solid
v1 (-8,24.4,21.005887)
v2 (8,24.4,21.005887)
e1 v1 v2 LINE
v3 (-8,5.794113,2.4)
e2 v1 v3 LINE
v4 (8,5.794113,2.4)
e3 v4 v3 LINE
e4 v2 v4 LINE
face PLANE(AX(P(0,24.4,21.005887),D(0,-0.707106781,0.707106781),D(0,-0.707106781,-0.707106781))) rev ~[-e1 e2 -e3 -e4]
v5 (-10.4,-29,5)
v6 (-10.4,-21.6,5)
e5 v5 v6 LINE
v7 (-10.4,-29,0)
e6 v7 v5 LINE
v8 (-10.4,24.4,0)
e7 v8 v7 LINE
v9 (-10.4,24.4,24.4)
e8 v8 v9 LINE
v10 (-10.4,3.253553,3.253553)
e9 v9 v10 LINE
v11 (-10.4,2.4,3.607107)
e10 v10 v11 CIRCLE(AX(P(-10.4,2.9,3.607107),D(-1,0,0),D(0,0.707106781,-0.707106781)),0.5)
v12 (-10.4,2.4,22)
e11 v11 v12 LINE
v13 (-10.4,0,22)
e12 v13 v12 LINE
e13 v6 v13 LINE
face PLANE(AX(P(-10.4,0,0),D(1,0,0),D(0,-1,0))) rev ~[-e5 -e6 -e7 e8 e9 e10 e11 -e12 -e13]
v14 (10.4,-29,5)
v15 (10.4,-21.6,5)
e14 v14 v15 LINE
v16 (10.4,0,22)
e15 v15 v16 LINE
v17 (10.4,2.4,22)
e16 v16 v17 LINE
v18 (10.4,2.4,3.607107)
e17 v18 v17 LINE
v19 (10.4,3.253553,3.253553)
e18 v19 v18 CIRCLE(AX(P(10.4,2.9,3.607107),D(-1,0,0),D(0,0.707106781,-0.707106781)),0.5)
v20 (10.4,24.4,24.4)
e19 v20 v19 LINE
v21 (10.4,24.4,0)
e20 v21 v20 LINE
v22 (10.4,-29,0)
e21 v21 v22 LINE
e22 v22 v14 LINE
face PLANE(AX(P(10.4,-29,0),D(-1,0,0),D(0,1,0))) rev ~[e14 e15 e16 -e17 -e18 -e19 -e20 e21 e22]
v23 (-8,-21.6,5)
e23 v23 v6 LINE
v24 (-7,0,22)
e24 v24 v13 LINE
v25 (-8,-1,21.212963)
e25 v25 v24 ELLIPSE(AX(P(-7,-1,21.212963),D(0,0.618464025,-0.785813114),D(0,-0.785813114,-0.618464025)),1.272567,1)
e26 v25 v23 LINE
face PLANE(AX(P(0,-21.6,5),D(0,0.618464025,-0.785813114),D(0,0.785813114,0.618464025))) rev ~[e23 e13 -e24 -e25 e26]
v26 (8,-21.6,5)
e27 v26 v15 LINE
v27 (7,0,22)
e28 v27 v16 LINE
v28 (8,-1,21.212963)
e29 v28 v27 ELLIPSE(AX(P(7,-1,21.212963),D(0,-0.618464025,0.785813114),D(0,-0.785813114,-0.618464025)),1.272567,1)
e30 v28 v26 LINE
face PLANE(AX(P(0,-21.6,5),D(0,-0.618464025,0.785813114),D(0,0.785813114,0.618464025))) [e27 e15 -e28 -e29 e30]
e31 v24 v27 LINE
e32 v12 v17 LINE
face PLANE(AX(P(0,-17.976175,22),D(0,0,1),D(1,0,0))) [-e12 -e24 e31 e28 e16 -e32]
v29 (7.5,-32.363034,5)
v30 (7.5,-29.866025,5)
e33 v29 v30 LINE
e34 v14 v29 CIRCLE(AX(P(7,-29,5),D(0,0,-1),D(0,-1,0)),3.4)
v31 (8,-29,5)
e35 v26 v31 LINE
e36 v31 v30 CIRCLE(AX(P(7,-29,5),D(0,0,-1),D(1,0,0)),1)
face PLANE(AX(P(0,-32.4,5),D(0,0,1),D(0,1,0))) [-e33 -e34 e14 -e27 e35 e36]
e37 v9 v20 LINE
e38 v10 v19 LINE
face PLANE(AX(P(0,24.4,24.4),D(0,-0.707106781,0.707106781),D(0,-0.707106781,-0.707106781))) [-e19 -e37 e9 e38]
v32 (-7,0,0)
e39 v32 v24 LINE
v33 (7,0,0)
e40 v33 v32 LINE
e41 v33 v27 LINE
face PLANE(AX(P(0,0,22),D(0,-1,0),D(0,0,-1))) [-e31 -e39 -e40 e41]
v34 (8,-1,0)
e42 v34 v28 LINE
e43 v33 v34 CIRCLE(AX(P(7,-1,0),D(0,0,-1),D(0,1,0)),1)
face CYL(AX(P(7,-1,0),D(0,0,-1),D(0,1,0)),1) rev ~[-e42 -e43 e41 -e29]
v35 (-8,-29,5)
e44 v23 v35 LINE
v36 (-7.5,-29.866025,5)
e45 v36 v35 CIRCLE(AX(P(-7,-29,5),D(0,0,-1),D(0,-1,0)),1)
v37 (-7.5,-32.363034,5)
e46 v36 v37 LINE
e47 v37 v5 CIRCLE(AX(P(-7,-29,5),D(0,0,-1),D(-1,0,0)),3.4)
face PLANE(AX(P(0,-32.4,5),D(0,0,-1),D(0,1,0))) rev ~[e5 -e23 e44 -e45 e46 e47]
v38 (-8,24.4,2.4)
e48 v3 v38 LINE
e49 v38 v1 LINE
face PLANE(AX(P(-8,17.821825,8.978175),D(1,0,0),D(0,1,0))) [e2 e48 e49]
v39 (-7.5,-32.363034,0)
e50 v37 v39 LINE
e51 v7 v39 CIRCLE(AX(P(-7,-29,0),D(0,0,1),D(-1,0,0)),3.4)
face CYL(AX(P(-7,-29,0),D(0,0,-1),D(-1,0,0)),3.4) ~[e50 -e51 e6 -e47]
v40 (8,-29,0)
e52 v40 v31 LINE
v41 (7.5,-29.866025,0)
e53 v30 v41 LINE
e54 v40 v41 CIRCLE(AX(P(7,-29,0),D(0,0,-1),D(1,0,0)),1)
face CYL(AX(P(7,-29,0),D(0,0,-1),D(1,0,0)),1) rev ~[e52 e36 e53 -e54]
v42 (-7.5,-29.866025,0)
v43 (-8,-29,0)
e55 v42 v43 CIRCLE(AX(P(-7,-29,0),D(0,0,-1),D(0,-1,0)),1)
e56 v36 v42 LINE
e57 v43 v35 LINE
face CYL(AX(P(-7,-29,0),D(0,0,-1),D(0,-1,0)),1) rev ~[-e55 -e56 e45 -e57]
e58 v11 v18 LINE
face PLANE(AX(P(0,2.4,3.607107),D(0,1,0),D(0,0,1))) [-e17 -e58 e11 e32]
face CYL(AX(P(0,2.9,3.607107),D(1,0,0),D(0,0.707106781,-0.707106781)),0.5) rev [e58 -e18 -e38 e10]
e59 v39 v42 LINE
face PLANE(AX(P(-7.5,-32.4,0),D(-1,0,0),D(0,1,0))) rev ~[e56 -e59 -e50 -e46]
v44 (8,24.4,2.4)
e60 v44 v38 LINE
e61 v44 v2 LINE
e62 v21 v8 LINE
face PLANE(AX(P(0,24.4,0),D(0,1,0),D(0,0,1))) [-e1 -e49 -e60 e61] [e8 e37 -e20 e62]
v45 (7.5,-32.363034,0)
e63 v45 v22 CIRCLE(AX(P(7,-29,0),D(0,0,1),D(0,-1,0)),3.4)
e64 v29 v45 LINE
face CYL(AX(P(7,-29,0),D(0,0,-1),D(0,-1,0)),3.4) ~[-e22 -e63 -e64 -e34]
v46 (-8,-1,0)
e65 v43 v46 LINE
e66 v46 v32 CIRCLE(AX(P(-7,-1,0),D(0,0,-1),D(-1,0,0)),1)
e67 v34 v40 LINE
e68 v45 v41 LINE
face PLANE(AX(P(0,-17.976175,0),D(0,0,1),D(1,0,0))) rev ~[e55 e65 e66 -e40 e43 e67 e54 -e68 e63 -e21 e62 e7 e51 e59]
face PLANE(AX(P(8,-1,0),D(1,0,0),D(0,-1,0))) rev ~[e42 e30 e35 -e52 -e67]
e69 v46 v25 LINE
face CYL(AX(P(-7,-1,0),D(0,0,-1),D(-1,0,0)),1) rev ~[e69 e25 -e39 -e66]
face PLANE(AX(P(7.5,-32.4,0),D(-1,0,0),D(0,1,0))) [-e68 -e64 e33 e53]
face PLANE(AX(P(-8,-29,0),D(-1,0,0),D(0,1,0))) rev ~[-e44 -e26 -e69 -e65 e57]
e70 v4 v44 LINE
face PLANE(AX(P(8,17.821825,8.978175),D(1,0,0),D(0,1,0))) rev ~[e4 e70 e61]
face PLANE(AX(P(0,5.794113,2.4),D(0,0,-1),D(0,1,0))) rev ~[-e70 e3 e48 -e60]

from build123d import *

# Parameters (mm, degrees)
F6_DEPTH       = 10.4
F8_DEPTH       = 22
F9_W           = 15
F9_H           = 3.4
F10_DEPTH      = 24.401
F12_DEPTH      = 10.401
F12_DEPTH_BACK = 10.401
F14_DEPTH      = 8


with BuildPart() as f6:
    # F5 (on Right) → F6 (new body, symmetric)
    with BuildSketch(Plane.YZ):
        with BuildLine():
            Line((24.4, 0), (24.4, 24.4))
            Line((24.4, 24.4), (3.2535533906, 3.2535533906))
            ThreePointArc((3.2535533906, 3.2535533906), (2.7086582838, 3.1451670149), (2.4, 3.6071067812))
            Line((2.4, 3.6071067812), (2.4, 22))
            Line((2.4, 22), (0, 22))
            Line((0, 22), (0, 0))
            Line((0, 0), (24.4, 0))
        make_face()
    extrude(amount=F6_DEPTH, both=True)

    # F7 (on Top) → F8 (join)
    with BuildSketch(Plane.XY):
        with BuildLine():
            Line((-7, 0), (-10.4, 0))
            Line((-10.4, 0), (-10.4, -21.6))
            Line((-10.4, -21.6), (-10.4, -29))
            ThreePointArc((-10.4, -29), (-9.404163056, -31.404163056), (-7, -32.4))
            Line((-7, -32.4), (7, -32.4))
            ThreePointArc((7, -32.4), (9.404163056, -31.404163056), (10.4, -29))
            Line((10.4, -29), (10.4, -21.6))
            Line((10.4, -21.6), (10.4, 0))
            Line((10.4, 0), (7, 0))
            ThreePointArc((7, 0), (7.7071067812, -0.2928932188), (8, -1))
            Line((8, -1), (8, -29))
            ThreePointArc((8, -29), (7.7071067812, -29.7071067812), (7, -30))
            Line((7, -30), (-7, -30))
            ThreePointArc((-7, -30), (-7.7071067812, -29.7071067812), (-8, -29))
            Line((-8, -29), (-8, -1))
            ThreePointArc((-8, -1), (-7.7071067812, -0.2928932188), (-7, 0))
        make_face()
    extrude(amount=F8_DEPTH)

    # F9 (on Top) → F10 (cut, through all)
    with BuildSketch(Plane.XY):
        with Locations((0, -30.7)):
            Rectangle(F9_W, F9_H)
    extrude(amount=F10_DEPTH, mode=Mode.SUBTRACT)

    # F11 (on Right) → F12 (cut, two sides)
    with BuildSketch(Plane.YZ) as f12_sk:
        Polygon((-32.4, 22), (-32.4, 5), (-21.6, 5), (0, 22), align=None)
    extrude(amount=F12_DEPTH, mode=Mode.SUBTRACT)
    extrude(f12_sk.sketch, amount=-F12_DEPTH_BACK, mode=Mode.SUBTRACT)

    # F13 (on Right) → F14 (cut, symmetric)
    with BuildSketch(Plane.YZ):
        Polygon((24.4, 2.4), (24.4, 21.0058874503), (5.7941125497, 2.4), align=None)
    extrude(amount=F14_DEPTH, both=True, mode=Mode.SUBTRACT)


solid = f6.part
